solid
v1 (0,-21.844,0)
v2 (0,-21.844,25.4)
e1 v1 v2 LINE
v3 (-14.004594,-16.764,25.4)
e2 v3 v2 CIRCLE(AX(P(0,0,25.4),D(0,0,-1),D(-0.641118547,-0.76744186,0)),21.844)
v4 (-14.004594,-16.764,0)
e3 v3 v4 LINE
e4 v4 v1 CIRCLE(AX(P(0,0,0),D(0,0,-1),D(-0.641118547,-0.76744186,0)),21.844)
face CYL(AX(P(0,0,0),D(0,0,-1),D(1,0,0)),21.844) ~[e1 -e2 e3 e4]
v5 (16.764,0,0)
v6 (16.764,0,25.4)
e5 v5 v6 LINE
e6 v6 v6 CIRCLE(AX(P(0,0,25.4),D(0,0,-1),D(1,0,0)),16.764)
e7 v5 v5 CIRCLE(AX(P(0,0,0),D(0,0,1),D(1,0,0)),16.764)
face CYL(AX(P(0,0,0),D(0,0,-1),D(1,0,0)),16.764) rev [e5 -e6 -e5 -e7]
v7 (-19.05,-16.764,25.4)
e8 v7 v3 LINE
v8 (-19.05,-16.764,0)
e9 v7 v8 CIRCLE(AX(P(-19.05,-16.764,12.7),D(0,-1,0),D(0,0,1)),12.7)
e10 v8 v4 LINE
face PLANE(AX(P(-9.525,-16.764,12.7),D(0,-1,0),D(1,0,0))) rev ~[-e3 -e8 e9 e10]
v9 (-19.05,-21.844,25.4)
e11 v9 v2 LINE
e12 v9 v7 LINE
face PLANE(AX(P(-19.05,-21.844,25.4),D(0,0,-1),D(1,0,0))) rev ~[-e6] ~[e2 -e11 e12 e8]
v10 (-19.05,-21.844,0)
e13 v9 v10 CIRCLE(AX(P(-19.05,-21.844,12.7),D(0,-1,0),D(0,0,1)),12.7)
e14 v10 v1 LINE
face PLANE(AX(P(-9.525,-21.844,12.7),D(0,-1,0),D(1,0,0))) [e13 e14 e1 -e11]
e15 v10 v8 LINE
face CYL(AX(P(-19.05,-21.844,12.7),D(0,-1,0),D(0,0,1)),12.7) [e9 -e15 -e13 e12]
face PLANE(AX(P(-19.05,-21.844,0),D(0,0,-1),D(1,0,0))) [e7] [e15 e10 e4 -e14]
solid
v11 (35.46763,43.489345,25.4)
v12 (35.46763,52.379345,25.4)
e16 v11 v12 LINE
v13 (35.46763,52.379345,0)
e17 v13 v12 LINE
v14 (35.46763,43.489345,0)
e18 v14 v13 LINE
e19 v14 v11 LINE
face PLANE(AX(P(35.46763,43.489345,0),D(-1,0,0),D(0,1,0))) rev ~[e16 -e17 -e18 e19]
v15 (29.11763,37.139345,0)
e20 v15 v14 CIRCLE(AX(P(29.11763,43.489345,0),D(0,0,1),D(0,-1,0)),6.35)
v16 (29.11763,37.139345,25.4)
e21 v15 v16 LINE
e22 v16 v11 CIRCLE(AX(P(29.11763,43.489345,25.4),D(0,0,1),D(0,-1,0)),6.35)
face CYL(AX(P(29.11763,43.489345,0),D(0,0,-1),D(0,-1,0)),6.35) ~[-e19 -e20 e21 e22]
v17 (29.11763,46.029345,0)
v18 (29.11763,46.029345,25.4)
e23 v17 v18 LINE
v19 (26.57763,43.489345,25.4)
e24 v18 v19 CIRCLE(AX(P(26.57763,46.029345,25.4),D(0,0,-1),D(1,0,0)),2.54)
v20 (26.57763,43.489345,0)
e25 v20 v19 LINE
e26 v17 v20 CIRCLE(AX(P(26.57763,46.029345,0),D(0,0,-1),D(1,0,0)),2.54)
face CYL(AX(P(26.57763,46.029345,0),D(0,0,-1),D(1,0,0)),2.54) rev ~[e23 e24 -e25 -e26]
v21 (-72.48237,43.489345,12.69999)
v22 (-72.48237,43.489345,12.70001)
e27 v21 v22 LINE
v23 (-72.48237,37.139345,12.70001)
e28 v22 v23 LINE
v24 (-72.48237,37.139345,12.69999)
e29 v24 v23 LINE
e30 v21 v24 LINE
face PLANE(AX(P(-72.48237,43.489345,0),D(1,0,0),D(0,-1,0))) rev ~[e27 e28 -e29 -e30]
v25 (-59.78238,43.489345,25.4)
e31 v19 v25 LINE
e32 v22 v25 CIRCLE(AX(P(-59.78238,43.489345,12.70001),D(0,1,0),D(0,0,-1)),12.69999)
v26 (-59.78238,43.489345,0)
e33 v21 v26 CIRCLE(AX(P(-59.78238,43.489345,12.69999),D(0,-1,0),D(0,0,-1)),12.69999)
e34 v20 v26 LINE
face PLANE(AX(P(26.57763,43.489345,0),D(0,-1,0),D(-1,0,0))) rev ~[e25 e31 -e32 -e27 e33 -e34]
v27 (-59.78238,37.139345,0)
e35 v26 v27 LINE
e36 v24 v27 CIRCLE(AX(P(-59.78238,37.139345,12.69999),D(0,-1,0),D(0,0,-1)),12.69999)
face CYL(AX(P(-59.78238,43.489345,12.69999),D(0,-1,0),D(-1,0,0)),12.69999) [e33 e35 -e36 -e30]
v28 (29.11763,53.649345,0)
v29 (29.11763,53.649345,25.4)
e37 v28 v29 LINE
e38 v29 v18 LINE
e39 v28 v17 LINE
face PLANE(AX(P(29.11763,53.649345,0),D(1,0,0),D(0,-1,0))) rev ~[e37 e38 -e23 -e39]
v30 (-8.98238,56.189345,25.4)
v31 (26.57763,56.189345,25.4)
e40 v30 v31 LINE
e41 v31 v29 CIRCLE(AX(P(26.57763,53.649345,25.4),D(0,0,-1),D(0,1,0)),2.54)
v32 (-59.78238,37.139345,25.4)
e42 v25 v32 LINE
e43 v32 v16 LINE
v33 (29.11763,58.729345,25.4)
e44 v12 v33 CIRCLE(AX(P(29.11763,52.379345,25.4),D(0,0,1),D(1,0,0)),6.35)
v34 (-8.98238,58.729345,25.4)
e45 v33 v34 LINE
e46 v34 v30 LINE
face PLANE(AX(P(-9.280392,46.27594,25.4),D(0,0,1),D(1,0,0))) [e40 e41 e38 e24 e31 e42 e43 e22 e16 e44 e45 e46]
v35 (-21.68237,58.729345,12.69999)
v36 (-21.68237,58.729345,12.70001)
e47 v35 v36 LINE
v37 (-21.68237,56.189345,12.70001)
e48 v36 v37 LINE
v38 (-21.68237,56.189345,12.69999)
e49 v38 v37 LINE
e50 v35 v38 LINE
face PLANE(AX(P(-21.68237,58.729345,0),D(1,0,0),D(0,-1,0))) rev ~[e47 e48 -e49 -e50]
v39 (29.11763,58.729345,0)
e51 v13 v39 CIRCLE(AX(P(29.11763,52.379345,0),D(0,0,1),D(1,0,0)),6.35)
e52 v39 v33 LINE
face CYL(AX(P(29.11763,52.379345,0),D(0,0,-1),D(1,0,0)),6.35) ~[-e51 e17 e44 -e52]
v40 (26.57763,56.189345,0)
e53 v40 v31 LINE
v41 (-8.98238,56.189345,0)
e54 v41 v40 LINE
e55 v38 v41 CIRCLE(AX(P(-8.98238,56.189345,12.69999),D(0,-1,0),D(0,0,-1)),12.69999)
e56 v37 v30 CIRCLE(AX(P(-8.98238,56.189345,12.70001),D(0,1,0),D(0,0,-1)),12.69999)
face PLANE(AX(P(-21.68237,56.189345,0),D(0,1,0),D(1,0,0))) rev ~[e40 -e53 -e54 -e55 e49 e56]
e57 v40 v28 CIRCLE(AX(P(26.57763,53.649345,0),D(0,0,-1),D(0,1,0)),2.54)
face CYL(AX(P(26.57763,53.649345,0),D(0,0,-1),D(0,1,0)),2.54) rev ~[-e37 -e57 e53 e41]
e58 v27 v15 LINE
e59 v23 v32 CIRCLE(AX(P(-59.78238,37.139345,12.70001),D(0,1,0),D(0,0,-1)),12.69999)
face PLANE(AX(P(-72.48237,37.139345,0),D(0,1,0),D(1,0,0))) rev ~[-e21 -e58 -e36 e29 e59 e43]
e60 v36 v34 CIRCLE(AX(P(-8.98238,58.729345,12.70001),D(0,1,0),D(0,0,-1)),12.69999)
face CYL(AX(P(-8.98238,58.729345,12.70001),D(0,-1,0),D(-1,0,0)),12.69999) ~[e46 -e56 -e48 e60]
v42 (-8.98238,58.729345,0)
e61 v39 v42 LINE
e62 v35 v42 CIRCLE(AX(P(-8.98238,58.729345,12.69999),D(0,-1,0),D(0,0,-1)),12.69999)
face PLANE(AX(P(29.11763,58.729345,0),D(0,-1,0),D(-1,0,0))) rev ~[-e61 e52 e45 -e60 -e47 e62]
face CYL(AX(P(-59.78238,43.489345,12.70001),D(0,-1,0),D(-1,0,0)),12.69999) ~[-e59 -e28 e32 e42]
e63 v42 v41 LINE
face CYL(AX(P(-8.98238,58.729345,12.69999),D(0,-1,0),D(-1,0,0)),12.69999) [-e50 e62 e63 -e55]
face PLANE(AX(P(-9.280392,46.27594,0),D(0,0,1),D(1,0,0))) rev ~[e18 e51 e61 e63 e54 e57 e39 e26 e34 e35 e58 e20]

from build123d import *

# Parameters (mm, degrees)
F0_R     = 21.844
F0_R_2   = 16.764
F1_DEPTH = 25.4
F3_W     = 19.05
F3_H     = 25.4
F4_DEPTH = 5.08
F6_DEPTH = 25.4
F7_R     = 12.69999


# Not quite as in the source:
# - a fillet or chamfer is up to 0.001 mm smaller than in the source, because OpenCascade refuses the exact size


with BuildPart() as f1:
    # F0 (on Top) → F1 (new body)
    with BuildSketch(Plane.XY):
        Circle(F0_R)
        Circle(F0_R_2, mode=Mode.SUBTRACT)
    extrude(amount=F1_DEPTH)

    # F3 (on offset) → F4 (join)
    with BuildSketch(Plane.XZ.offset(21.844)):
        with Locations((-9.525, 12.7)):
            Rectangle(F3_W, F3_H)
        with BuildLine():
            ThreePointArc((-19.05, 25.4), (-31.75, 12.7), (-19.05, 0))
            Line((-19.05, 0), (-19.05, 25.4))
        make_face()
    extrude(amount=-F4_DEPTH)


with BuildPart() as f6:
    # F5 (on Top) → F6 (new body)
    with BuildSketch(Plane.XY):
        with BuildLine():
            ThreePointArc((29.1176303876, 46.0293454591), (28.3736816118, 44.2332942349), (26.5776303876, 43.4893454591))
            Line((26.5776303876, 43.4893454591), (-72.4823696124, 43.4893454591))
            Line((-72.4823696124, 43.4893454591), (-72.4823696124, 37.1393454591))
            Line((-72.4823696124, 37.1393454591), (29.1176303876, 37.1393454591))
            ThreePointArc((29.1176303876, 37.1393454591), (33.6077584481, 38.9992173986), (35.4676303876, 43.4893454591))
            Line((35.4676303876, 43.4893454591), (35.4676303876, 52.3793454591))
            ThreePointArc((35.4676303876, 52.3793454591), (33.6077584481, 56.8694735197), (29.1176303876, 58.7293454591))
            Line((29.1176303876, 58.7293454591), (-21.6823696124, 58.7293454591))
            Line((-21.6823696124, 58.7293454591), (-21.6823696124, 56.1893454591))
            Line((-21.6823696124, 56.1893454591), (26.5776303876, 56.1893454591))
            ThreePointArc((26.5776303876, 56.1893454591), (28.3736816118, 55.4453966833), (29.1176303876, 53.6493454591))
            Line((29.1176303876, 53.6493454591), (29.1176303876, 46.0293454591))
        make_face()
    extrude(amount=F6_DEPTH)

    # F7 (radius 12.7 in the source; OpenCascade refuses exactly that, so slightly less here)
    f7_edges = [f6.edges().sort_by_distance(p)[0] for p in [
        (-72.48237, 40.314345, 25.4),
        (-72.48237, 40.314345, 0),
        (-21.68237, 57.459345, 25.4),
        (-21.68237, 57.459345, 0),
    ]]
    fillet(f7_edges, radius=F7_R)


solid = Compound([f1.part, f6.part])
